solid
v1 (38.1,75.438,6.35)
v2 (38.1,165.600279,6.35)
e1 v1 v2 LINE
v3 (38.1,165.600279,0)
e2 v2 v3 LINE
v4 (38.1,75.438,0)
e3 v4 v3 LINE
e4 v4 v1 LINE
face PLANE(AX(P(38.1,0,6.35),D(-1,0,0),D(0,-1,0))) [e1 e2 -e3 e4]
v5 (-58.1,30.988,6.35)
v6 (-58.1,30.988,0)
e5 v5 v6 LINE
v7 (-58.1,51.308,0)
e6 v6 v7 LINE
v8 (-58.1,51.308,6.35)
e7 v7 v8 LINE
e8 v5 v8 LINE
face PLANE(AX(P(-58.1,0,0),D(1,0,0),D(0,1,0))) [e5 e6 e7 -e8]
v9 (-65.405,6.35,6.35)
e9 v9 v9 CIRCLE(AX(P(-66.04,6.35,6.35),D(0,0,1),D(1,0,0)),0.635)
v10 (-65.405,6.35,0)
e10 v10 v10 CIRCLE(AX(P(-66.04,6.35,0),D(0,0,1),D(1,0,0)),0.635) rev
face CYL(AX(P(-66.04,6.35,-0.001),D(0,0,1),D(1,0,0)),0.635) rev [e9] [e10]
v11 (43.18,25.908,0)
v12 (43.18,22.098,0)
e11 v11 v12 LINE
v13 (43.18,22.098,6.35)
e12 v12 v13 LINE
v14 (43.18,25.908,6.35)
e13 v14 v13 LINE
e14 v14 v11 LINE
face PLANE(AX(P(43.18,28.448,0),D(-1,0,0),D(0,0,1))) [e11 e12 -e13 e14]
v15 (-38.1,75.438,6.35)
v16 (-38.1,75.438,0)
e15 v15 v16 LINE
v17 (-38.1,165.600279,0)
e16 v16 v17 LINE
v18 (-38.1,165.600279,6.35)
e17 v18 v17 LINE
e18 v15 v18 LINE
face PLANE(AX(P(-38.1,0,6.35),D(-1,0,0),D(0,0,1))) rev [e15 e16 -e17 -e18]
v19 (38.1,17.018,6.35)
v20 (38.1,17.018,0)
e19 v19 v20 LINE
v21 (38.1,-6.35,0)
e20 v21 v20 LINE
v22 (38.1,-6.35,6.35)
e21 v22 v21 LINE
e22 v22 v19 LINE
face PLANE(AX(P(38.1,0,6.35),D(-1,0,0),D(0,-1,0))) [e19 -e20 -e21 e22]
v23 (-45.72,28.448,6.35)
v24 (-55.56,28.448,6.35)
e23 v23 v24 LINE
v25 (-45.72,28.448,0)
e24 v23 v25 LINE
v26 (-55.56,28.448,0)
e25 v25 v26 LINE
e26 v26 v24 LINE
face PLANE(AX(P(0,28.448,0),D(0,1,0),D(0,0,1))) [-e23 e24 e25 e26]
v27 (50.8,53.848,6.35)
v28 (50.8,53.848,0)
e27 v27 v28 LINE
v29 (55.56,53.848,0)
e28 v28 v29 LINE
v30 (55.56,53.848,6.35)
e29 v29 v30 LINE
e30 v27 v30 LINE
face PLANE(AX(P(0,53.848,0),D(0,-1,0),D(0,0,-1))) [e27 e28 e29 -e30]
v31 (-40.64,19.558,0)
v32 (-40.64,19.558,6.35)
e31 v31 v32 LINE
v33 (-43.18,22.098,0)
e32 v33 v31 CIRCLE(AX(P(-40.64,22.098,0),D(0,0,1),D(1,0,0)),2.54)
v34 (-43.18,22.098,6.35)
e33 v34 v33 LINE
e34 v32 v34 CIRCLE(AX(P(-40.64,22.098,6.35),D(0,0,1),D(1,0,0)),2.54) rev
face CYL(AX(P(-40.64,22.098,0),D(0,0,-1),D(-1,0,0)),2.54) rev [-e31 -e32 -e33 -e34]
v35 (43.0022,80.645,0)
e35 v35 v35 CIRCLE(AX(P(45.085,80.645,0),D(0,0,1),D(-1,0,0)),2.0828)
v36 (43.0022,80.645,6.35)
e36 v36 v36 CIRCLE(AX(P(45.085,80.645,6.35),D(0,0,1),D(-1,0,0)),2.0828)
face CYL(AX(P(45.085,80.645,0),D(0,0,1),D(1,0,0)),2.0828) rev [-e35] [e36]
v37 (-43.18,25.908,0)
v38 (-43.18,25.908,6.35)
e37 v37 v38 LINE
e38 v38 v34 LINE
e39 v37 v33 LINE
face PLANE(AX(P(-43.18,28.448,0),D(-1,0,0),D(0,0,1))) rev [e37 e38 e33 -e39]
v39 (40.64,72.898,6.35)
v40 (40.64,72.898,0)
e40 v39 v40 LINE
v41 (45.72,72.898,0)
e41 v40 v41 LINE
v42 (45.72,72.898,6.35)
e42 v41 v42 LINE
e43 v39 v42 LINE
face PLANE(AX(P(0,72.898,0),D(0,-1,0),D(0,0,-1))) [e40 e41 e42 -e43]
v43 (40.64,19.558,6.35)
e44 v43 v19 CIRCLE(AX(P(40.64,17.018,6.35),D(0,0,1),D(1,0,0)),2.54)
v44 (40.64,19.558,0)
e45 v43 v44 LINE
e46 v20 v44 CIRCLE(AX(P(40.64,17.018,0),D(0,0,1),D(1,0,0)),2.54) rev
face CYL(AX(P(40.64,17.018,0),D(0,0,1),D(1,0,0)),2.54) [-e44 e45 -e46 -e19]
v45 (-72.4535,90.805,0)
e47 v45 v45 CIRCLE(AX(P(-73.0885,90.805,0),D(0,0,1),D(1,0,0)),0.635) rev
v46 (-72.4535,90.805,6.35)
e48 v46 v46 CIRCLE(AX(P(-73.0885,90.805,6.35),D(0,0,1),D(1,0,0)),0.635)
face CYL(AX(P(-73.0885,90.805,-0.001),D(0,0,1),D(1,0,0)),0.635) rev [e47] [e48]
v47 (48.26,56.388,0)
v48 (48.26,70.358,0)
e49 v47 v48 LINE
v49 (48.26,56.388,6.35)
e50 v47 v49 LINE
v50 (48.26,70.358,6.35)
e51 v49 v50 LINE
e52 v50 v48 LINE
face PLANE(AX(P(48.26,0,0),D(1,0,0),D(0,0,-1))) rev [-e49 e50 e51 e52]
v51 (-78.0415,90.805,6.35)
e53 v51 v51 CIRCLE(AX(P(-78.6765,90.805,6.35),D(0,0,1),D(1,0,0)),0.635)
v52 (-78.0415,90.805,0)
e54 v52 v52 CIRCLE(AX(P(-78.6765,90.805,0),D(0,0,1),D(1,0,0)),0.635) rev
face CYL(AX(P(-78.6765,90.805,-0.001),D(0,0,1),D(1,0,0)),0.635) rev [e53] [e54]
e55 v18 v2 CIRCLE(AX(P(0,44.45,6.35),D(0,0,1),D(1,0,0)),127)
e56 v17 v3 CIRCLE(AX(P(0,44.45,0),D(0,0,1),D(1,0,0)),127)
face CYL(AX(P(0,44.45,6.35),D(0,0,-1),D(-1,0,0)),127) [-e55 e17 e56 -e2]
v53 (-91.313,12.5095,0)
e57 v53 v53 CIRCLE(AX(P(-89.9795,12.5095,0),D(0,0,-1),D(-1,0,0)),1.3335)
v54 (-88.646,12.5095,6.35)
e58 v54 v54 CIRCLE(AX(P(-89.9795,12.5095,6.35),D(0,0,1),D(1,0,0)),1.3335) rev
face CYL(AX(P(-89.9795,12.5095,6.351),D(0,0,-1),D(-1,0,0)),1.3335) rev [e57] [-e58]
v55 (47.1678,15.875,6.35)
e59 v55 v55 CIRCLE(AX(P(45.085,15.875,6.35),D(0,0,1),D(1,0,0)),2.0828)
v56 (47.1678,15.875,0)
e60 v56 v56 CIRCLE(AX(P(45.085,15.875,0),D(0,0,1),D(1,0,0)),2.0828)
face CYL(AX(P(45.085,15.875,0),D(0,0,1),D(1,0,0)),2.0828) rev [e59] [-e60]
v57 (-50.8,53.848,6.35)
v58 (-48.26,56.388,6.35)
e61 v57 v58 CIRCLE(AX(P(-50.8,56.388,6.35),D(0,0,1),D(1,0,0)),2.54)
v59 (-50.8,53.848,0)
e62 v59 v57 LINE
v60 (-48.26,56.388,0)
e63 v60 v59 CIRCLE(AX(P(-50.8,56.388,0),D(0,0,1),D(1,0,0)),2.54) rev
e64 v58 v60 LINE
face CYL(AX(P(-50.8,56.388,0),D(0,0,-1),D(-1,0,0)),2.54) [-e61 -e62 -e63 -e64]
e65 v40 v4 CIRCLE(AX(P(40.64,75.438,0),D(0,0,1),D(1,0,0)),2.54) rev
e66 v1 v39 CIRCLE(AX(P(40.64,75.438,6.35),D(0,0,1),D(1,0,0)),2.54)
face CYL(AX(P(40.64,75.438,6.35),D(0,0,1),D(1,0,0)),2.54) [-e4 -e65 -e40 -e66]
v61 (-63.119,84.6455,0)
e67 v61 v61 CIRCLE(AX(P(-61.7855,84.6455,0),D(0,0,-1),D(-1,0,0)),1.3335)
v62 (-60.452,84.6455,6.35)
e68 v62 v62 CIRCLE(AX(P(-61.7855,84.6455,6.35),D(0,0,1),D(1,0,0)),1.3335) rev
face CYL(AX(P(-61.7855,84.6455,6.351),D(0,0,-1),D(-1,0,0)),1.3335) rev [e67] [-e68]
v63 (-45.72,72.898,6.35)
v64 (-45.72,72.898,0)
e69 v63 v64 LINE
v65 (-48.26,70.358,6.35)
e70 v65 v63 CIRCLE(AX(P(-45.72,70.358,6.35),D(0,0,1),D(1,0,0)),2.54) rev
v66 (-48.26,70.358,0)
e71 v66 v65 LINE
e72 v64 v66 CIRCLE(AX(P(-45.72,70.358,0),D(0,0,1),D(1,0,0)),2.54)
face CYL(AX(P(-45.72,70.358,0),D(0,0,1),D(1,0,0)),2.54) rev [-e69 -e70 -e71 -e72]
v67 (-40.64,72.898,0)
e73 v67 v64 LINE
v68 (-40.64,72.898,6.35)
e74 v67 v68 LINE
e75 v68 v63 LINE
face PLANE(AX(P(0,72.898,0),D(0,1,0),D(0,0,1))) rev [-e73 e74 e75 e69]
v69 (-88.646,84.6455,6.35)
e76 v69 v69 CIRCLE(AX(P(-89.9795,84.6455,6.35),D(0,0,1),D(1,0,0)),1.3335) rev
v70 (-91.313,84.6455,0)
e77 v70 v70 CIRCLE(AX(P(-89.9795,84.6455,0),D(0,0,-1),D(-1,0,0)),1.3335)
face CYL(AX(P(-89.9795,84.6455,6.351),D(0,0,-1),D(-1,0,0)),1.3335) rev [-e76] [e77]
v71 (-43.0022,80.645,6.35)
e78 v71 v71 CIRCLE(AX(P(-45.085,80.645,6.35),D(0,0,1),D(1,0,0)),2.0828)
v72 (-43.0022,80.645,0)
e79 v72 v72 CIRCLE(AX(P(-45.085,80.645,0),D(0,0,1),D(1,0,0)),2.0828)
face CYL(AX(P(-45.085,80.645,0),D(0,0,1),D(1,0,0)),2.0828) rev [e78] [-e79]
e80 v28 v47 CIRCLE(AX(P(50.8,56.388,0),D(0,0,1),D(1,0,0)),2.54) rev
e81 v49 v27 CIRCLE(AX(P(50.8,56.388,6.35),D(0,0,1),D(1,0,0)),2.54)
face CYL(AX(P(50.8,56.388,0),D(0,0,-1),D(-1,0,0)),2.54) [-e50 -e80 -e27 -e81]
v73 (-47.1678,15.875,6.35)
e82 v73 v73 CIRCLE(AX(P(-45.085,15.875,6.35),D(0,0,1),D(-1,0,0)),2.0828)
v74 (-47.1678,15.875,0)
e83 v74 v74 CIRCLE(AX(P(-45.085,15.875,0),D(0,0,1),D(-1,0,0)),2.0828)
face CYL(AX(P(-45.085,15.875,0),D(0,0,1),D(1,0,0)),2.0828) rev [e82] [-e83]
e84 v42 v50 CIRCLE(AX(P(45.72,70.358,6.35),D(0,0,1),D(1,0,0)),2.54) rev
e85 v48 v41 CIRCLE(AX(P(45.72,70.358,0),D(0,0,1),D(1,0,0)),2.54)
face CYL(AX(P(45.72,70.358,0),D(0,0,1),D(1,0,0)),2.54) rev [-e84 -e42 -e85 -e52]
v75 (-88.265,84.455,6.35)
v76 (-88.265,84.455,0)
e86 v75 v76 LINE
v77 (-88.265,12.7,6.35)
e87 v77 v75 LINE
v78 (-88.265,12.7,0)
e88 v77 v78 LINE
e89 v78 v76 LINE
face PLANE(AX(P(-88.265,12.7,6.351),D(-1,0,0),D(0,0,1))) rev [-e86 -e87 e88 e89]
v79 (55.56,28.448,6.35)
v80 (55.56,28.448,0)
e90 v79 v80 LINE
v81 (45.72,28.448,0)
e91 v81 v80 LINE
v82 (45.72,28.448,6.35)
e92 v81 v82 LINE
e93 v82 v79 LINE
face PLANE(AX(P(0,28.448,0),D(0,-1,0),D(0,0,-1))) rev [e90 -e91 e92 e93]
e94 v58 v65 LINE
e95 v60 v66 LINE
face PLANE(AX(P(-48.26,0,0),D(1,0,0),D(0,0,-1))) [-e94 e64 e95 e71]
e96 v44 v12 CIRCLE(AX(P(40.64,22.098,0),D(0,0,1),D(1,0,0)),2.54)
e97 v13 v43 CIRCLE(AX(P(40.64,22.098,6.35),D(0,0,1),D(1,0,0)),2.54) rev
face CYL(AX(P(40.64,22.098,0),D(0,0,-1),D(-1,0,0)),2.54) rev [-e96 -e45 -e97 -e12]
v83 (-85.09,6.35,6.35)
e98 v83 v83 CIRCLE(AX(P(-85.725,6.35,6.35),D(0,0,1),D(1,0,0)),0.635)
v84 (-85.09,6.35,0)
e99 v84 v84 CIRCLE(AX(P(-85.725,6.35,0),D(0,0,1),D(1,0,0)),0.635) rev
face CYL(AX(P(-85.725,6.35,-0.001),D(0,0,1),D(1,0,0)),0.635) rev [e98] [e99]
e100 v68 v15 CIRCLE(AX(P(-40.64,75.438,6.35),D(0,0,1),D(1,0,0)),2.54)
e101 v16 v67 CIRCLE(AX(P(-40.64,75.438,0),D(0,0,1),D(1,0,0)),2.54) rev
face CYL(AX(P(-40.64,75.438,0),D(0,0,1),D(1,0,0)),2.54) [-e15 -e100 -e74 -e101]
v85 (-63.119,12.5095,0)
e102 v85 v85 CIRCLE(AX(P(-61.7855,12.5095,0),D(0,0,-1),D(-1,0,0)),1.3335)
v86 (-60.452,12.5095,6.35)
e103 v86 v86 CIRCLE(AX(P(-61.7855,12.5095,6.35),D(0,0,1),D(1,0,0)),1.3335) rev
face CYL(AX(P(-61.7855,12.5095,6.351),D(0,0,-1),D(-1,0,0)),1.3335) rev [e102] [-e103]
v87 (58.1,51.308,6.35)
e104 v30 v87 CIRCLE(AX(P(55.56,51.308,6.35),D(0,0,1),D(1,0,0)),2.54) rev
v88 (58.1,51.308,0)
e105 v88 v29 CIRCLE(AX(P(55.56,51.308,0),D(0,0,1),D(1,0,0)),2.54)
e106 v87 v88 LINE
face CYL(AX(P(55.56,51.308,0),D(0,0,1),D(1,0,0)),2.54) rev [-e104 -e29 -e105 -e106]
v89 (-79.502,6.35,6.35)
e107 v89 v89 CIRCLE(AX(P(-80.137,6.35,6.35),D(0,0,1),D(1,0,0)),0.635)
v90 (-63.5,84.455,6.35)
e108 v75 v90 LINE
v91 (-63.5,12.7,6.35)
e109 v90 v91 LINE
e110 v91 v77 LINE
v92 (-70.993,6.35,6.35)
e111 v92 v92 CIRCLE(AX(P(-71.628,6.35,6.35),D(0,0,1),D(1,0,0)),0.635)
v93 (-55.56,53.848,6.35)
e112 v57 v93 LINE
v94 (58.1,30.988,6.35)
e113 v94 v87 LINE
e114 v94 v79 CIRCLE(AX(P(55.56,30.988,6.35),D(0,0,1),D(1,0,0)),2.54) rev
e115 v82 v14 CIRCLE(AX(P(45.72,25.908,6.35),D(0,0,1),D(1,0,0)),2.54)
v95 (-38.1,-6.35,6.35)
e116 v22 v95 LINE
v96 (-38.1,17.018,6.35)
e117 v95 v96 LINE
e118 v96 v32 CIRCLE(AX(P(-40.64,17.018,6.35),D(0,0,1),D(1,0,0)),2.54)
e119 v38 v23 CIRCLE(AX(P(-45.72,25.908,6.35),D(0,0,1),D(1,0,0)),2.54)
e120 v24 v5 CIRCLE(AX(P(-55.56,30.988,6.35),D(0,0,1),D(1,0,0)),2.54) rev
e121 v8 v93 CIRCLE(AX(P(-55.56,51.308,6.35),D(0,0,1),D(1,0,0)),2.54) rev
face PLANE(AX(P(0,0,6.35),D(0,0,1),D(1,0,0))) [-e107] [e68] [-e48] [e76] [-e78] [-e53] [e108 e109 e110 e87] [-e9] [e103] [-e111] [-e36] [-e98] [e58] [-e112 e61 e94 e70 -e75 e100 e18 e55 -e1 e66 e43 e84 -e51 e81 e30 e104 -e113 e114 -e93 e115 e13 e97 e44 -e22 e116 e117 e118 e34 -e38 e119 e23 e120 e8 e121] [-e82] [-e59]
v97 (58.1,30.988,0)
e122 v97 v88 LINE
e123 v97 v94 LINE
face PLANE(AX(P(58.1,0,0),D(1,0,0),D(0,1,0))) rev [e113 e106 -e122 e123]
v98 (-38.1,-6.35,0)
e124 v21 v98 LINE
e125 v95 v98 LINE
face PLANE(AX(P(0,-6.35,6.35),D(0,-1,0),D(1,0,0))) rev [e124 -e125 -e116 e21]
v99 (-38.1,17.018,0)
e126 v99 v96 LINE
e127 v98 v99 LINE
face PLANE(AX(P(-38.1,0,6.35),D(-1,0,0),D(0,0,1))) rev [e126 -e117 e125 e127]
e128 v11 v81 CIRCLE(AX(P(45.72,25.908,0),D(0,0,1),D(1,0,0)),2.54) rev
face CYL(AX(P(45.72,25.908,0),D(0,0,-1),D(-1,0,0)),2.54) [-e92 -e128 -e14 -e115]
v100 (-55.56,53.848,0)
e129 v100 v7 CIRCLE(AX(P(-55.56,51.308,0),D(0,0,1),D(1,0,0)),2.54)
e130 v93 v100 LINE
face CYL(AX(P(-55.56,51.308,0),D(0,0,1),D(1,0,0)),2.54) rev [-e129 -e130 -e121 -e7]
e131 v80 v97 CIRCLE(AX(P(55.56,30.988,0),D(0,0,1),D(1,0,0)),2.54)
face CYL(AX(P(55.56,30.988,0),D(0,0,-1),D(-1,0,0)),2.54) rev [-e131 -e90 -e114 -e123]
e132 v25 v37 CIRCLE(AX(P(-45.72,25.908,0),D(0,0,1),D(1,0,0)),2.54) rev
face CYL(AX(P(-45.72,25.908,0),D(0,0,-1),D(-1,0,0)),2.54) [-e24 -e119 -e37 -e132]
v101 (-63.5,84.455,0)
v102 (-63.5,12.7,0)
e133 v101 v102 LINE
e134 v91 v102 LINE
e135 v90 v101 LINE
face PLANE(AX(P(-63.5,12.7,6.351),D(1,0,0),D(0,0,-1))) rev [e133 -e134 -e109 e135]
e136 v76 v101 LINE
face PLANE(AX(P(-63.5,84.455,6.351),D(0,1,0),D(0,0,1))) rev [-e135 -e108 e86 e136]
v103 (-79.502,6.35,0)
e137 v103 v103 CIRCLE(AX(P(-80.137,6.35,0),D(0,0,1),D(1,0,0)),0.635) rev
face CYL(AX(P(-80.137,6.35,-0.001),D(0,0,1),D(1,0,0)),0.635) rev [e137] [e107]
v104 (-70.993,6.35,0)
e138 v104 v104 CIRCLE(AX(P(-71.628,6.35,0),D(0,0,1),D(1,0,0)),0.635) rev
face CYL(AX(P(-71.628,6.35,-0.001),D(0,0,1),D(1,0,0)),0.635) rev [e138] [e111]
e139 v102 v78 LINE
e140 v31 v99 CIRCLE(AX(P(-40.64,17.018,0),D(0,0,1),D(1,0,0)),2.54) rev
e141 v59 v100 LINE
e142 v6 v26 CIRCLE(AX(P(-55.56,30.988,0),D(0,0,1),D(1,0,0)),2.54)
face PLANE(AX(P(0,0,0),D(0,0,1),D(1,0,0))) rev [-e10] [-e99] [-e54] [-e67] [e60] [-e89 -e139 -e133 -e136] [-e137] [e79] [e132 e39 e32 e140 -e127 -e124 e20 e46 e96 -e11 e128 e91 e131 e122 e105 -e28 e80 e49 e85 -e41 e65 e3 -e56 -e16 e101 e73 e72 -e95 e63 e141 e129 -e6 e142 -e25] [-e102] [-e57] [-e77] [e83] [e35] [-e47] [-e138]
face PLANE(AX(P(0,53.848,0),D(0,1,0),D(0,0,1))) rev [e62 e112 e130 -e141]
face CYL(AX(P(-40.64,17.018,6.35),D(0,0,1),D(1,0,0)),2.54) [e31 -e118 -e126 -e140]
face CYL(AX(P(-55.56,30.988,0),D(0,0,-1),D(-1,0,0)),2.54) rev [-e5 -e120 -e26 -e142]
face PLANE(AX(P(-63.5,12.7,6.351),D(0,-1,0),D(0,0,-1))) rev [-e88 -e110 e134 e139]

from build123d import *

# Parameters (mm, degrees)
BOSS_EXTRUDE1_DEPTH = 6.35
CUT_EXTRUDE1_REACH  = 210.789
SKETCH2_R           = 1.3335
SKETCH2_W           = 24.765
SKETCH2_H           = 71.755
CUT_EXTRUDE2_REACH  = 210.789
SKETCH3_R           = 0.635
CUT_EXTRUDE3_DEPTH  = 209.788828163
FILLET1_START       = -1
FILLET1_DEPTH       = 8
FILLET1_2_DEPTH     = 6.35
SKETCH5_R           = 2.0828
CUT_EXTRUDE4_DEPTH  = 209.788828163


with BuildPart() as part:
    # Sketch1 → Boss-Extrude1 (new body)
    with BuildSketch(Plane.XY):
        with BuildLine():
            Line((-38.1, 92.71), (-38.1, 165.60027858))
            ThreePointArc((-38.1, 165.60027858), (0, -82.55), (38.1, 165.60027858))
            Line((38.1, 165.60027858), (38.1, 92.71))
            Line((38.1, 92.71), (38.1, -6.35))
            Line((38.1, -6.35), (-38.1, -6.35))
            Line((-38.1, -6.35), (-38.1, 92.71))
        make_face()
    extrude(amount=BOSS_EXTRUDE1_DEPTH)

    # Sketch2 → Cut-Extrude1 (cut, up to next)
    with BuildSketch(Plane(origin=(0, 0, 0), x_dir=(-1, 0, 0), z_dir=(0, 0, -1)), mode=Mode.PRIVATE) as cut_extrude1_sk1:
        with Locations((61.7855, 12.5095)):
            Circle(SKETCH2_R)
    cut_extrude1_tool1 = extrude(cut_extrude1_sk1.sketch, amount=-CUT_EXTRUDE1_REACH, mode=Mode.PRIVATE) & part.part
    # Sketch2 → Cut-Extrude1 (cut, up to next)
    with BuildSketch(Plane(origin=(0, 0, 0), x_dir=(-1, 0, 0), z_dir=(0, 0, -1)), mode=Mode.PRIVATE) as cut_extrude1_sk2:
        with Locations((61.7855, 84.6455)):
            Circle(SKETCH2_R)
    cut_extrude1_tool2 = extrude(cut_extrude1_sk2.sketch, amount=-CUT_EXTRUDE1_REACH, mode=Mode.PRIVATE) & part.part
    # Sketch2 → Cut-Extrude1 (cut, up to next)
    with BuildSketch(Plane(origin=(0, 0, 0), x_dir=(-1, 0, 0), z_dir=(0, 0, -1)), mode=Mode.PRIVATE) as cut_extrude1_sk3:
        with Locations((89.9795, 84.6455)):
            Circle(SKETCH2_R)
    cut_extrude1_tool3 = extrude(cut_extrude1_sk3.sketch, amount=-CUT_EXTRUDE1_REACH, mode=Mode.PRIVATE) & part.part
    # Sketch2 → Cut-Extrude1 (cut, up to next)
    with BuildSketch(Plane(origin=(0, 0, 0), x_dir=(-1, 0, 0), z_dir=(0, 0, -1)), mode=Mode.PRIVATE) as cut_extrude1_sk4:
        with Locations((89.9795, 12.5095)):
            Circle(SKETCH2_R)
    cut_extrude1_tool4 = extrude(cut_extrude1_sk4.sketch, amount=-CUT_EXTRUDE1_REACH, mode=Mode.PRIVATE) & part.part
    # Sketch2 → Cut-Extrude1 (cut, up to next)
    with BuildSketch(Plane(origin=(0, 0, 0), x_dir=(-1, 0, 0), z_dir=(0, 0, -1)), mode=Mode.PRIVATE) as cut_extrude1_sk5:
        with Locations((75.8825, 48.5775)):
            Rectangle(SKETCH2_W, SKETCH2_H)
    cut_extrude1_tool5 = extrude(cut_extrude1_sk5.sketch, amount=-CUT_EXTRUDE1_REACH, mode=Mode.PRIVATE) & part.part
    add(cut_extrude1_tool1.solids().sort_by_distance((-61.7855, 12.5095, 0))[0], mode=Mode.SUBTRACT)
    add(cut_extrude1_tool2.solids().sort_by_distance((-61.7855, 84.6455, 0))[0], mode=Mode.SUBTRACT)
    add(cut_extrude1_tool3.solids().sort_by_distance((-89.9795, 84.6455, 0))[0], mode=Mode.SUBTRACT)
    add(cut_extrude1_tool4.solids().sort_by_distance((-89.9795, 12.5095, 0))[0], mode=Mode.SUBTRACT)
    add(cut_extrude1_tool5.solids().sort_by_distance((-75.8825, 48.5775, 0))[0], mode=Mode.SUBTRACT)

    # Sketch3 → Cut-Extrude2 (cut, up to next)
    with BuildSketch(Plane.XY.offset(6.35), mode=Mode.PRIVATE) as cut_extrude2_sk1:
        with Locations((-66.04, 6.35)):
            Circle(SKETCH3_R)
    cut_extrude2_tool1 = extrude(cut_extrude2_sk1.sketch, amount=-CUT_EXTRUDE2_REACH, mode=Mode.PRIVATE) & part.part
    # Sketch3 → Cut-Extrude2 (cut, up to next)
    with BuildSketch(Plane.XY.offset(6.35), mode=Mode.PRIVATE) as cut_extrude2_sk2:
        with Locations((-71.628, 6.35)):
            Circle(SKETCH3_R)
    cut_extrude2_tool2 = extrude(cut_extrude2_sk2.sketch, amount=-CUT_EXTRUDE2_REACH, mode=Mode.PRIVATE) & part.part
    # Sketch3 → Cut-Extrude2 (cut, up to next)
    with BuildSketch(Plane.XY.offset(6.35), mode=Mode.PRIVATE) as cut_extrude2_sk3:
        with Locations((-80.137, 6.35)):
            Circle(SKETCH3_R)
    cut_extrude2_tool3 = extrude(cut_extrude2_sk3.sketch, amount=-CUT_EXTRUDE2_REACH, mode=Mode.PRIVATE) & part.part
    # Sketch3 → Cut-Extrude2 (cut, up to next)
    with BuildSketch(Plane.XY.offset(6.35), mode=Mode.PRIVATE) as cut_extrude2_sk4:
        with Locations((-85.725, 6.35)):
            Circle(SKETCH3_R)
    cut_extrude2_tool4 = extrude(cut_extrude2_sk4.sketch, amount=-CUT_EXTRUDE2_REACH, mode=Mode.PRIVATE) & part.part
    # Sketch3 → Cut-Extrude2 (cut, up to next)
    with BuildSketch(Plane.XY.offset(6.35), mode=Mode.PRIVATE) as cut_extrude2_sk5:
        with Locations((-73.0885, 90.805)):
            Circle(SKETCH3_R)
    cut_extrude2_tool5 = extrude(cut_extrude2_sk5.sketch, amount=-CUT_EXTRUDE2_REACH, mode=Mode.PRIVATE) & part.part
    # Sketch3 → Cut-Extrude2 (cut, up to next)
    with BuildSketch(Plane.XY.offset(6.35), mode=Mode.PRIVATE) as cut_extrude2_sk6:
        with Locations((-78.6765, 90.805)):
            Circle(SKETCH3_R)
    cut_extrude2_tool6 = extrude(cut_extrude2_sk6.sketch, amount=-CUT_EXTRUDE2_REACH, mode=Mode.PRIVATE) & part.part
    add(cut_extrude2_tool1.solids().sort_by_distance((-66.04, 6.35, 6.35))[0], mode=Mode.SUBTRACT)
    add(cut_extrude2_tool2.solids().sort_by_distance((-71.628, 6.35, 6.35))[0], mode=Mode.SUBTRACT)
    add(cut_extrude2_tool3.solids().sort_by_distance((-80.137, 6.35, 6.35))[0], mode=Mode.SUBTRACT)
    add(cut_extrude2_tool4.solids().sort_by_distance((-85.725, 6.35, 6.35))[0], mode=Mode.SUBTRACT)
    add(cut_extrude2_tool5.solids().sort_by_distance((-73.0885, 90.805, 6.35))[0], mode=Mode.SUBTRACT)
    add(cut_extrude2_tool6.solids().sort_by_distance((-78.6765, 90.805, 6.35))[0], mode=Mode.SUBTRACT)

    # Sketch4 → Cut-Extrude3 (cut, through all)
    with BuildSketch(Plane.XY.offset(6.35)):
        Polygon((-48.26, 72.898), (-48.26, 53.848), (-58.1, 53.848), (-58.1, 28.448), (-43.18, 28.448), (-43.18, 19.558), (-38.1, 19.558), (-38.1, 72.898), align=None)
        Polygon((43.18, 28.448), (58.1, 28.448), (58.1, 53.848), (48.26, 53.848), (48.26, 72.898), (38.1, 72.898), (38.1, 19.558), (43.18, 19.558), align=None)
    extrude(amount=-CUT_EXTRUDE3_DEPTH, mode=Mode.SUBTRACT)

    # Fillet1: read off the stored shape, not the designer's step
    # Fillet1 outline → Fillet1 (cut)
    with BuildSketch(Plane.XY.offset(FILLET1_START)):
        with BuildLine():
            Line((38.1, 72.898), (40.64, 72.898))
            ThreePointArc((40.64, 72.898), (38.843948776, 73.641948776), (38.1, 75.438))
            Line((38.1, 75.438), (38.1, 72.898))
        make_face()
        with BuildLine():
            Line((48.26, 53.848), (50.8, 53.848))
            ThreePointArc((50.8, 53.848), (49.003948776, 54.591948776), (48.26, 56.388))
            Line((48.26, 56.388), (48.26, 53.848))
        make_face()
        with BuildLine():
            Line((43.18, 28.448), (43.18, 25.908))
            ThreePointArc((43.18, 25.908), (43.923948776, 27.704051224), (45.72, 28.448))
            Line((45.72, 28.448), (43.18, 28.448))
        make_face()
        with BuildLine():
            ThreePointArc((38.1, 17.018), (38.843948776, 18.814051224), (40.64, 19.558))
            Line((40.64, 19.558), (38.1, 19.558))
            Line((38.1, 19.558), (38.1, 17.018))
        make_face()
        with BuildLine():
            Line((-38.1, 19.558), (-40.64, 19.558))
            ThreePointArc((-40.64, 19.558), (-38.843948776, 18.814051224), (-38.1, 17.018))
            Line((-38.1, 17.018), (-38.1, 19.558))
        make_face()
        with BuildLine():
            ThreePointArc((-38.1, 75.438), (-38.843948776, 73.641948776), (-40.64, 72.898))
            Line((-40.64, 72.898), (-38.1, 72.898))
            Line((-38.1, 72.898), (-38.1, 75.438))
        make_face()
        with BuildLine():
            ThreePointArc((-48.26, 56.388), (-49.003948776, 54.591948776), (-50.8, 53.848))
            Line((-50.8, 53.848), (-48.26, 53.848))
            Line((-48.26, 53.848), (-48.26, 56.388))
        make_face()
        with BuildLine():
            ThreePointArc((-45.72, 28.448), (-43.923948776, 27.704051224), (-43.18, 25.908))
            Line((-43.18, 25.908), (-43.18, 28.448))
            Line((-43.18, 28.448), (-45.72, 28.448))
        make_face()
    extrude(amount=FILLET1_DEPTH, mode=Mode.SUBTRACT)

    # Fillet1 2 outline → Fillet1 2 (add)
    with BuildSketch(Plane.XY):
        with BuildLine():
            Line((43.18, 19.558), (43.18, 22.098))
            ThreePointArc((43.18, 22.098), (42.436051224, 20.301948776), (40.64, 19.558))
            Line((40.64, 19.558), (43.18, 19.558))
        make_face()
        with BuildLine():
            ThreePointArc((45.72, 72.898), (47.516051224, 72.154051224), (48.26, 70.358))
            Line((48.26, 70.358), (48.26, 72.898))
            Line((48.26, 72.898), (45.72, 72.898))
        make_face()
        with BuildLine():
            ThreePointArc((55.56, 53.848), (57.356051224, 53.104051224), (58.1, 51.308))
            Line((58.1, 51.308), (58.1, 53.848))
            Line((58.1, 53.848), (55.56, 53.848))
        make_face()
        with BuildLine():
            ThreePointArc((58.1, 30.988), (57.356051224, 29.191948776), (55.56, 28.448))
            Line((55.56, 28.448), (58.1, 28.448))
            Line((58.1, 28.448), (58.1, 30.988))
        make_face()
        with BuildLine():
            Line((-43.18, 19.558), (-40.64, 19.558))
            ThreePointArc((-40.64, 19.558), (-42.436051224, 20.301948776), (-43.18, 22.098))
            Line((-43.18, 22.098), (-43.18, 19.558))
        make_face()
        with BuildLine():
            Line((-48.26, 72.898), (-48.26, 70.358))
            ThreePointArc((-48.26, 70.358), (-47.516051224, 72.154051224), (-45.72, 72.898))
            Line((-45.72, 72.898), (-48.26, 72.898))
        make_face()
        with BuildLine():
            Line((-58.1, 53.848), (-58.1, 51.308))
            ThreePointArc((-58.1, 51.308), (-57.356051224, 53.104051224), (-55.56, 53.848))
            Line((-55.56, 53.848), (-58.1, 53.848))
        make_face()
        with BuildLine():
            Line((-58.1, 28.448), (-55.56, 28.448))
            ThreePointArc((-55.56, 28.448), (-57.356051224, 29.191948776), (-58.1, 30.988))
            Line((-58.1, 30.988), (-58.1, 28.448))
        make_face()
    extrude(amount=FILLET1_2_DEPTH)

    # Sketch5 → Cut-Extrude4 (cut, through all)
    with BuildSketch(Plane.XY.offset(6.35)):
        with Locations((-45.085, 80.645)):
            Circle(SKETCH5_R)
        with Locations(Location((45.085, 80.645, 0), (0, 0, 180))):
            Circle(SKETCH5_R)
        with Locations((45.085, 15.875)):
            Circle(SKETCH5_R)
        with Locations(Location((-45.085, 15.875, 0), (0, 0, 180))):
            Circle(SKETCH5_R)
    extrude(amount=-CUT_EXTRUDE4_DEPTH, mode=Mode.SUBTRACT)


solid = part.part
